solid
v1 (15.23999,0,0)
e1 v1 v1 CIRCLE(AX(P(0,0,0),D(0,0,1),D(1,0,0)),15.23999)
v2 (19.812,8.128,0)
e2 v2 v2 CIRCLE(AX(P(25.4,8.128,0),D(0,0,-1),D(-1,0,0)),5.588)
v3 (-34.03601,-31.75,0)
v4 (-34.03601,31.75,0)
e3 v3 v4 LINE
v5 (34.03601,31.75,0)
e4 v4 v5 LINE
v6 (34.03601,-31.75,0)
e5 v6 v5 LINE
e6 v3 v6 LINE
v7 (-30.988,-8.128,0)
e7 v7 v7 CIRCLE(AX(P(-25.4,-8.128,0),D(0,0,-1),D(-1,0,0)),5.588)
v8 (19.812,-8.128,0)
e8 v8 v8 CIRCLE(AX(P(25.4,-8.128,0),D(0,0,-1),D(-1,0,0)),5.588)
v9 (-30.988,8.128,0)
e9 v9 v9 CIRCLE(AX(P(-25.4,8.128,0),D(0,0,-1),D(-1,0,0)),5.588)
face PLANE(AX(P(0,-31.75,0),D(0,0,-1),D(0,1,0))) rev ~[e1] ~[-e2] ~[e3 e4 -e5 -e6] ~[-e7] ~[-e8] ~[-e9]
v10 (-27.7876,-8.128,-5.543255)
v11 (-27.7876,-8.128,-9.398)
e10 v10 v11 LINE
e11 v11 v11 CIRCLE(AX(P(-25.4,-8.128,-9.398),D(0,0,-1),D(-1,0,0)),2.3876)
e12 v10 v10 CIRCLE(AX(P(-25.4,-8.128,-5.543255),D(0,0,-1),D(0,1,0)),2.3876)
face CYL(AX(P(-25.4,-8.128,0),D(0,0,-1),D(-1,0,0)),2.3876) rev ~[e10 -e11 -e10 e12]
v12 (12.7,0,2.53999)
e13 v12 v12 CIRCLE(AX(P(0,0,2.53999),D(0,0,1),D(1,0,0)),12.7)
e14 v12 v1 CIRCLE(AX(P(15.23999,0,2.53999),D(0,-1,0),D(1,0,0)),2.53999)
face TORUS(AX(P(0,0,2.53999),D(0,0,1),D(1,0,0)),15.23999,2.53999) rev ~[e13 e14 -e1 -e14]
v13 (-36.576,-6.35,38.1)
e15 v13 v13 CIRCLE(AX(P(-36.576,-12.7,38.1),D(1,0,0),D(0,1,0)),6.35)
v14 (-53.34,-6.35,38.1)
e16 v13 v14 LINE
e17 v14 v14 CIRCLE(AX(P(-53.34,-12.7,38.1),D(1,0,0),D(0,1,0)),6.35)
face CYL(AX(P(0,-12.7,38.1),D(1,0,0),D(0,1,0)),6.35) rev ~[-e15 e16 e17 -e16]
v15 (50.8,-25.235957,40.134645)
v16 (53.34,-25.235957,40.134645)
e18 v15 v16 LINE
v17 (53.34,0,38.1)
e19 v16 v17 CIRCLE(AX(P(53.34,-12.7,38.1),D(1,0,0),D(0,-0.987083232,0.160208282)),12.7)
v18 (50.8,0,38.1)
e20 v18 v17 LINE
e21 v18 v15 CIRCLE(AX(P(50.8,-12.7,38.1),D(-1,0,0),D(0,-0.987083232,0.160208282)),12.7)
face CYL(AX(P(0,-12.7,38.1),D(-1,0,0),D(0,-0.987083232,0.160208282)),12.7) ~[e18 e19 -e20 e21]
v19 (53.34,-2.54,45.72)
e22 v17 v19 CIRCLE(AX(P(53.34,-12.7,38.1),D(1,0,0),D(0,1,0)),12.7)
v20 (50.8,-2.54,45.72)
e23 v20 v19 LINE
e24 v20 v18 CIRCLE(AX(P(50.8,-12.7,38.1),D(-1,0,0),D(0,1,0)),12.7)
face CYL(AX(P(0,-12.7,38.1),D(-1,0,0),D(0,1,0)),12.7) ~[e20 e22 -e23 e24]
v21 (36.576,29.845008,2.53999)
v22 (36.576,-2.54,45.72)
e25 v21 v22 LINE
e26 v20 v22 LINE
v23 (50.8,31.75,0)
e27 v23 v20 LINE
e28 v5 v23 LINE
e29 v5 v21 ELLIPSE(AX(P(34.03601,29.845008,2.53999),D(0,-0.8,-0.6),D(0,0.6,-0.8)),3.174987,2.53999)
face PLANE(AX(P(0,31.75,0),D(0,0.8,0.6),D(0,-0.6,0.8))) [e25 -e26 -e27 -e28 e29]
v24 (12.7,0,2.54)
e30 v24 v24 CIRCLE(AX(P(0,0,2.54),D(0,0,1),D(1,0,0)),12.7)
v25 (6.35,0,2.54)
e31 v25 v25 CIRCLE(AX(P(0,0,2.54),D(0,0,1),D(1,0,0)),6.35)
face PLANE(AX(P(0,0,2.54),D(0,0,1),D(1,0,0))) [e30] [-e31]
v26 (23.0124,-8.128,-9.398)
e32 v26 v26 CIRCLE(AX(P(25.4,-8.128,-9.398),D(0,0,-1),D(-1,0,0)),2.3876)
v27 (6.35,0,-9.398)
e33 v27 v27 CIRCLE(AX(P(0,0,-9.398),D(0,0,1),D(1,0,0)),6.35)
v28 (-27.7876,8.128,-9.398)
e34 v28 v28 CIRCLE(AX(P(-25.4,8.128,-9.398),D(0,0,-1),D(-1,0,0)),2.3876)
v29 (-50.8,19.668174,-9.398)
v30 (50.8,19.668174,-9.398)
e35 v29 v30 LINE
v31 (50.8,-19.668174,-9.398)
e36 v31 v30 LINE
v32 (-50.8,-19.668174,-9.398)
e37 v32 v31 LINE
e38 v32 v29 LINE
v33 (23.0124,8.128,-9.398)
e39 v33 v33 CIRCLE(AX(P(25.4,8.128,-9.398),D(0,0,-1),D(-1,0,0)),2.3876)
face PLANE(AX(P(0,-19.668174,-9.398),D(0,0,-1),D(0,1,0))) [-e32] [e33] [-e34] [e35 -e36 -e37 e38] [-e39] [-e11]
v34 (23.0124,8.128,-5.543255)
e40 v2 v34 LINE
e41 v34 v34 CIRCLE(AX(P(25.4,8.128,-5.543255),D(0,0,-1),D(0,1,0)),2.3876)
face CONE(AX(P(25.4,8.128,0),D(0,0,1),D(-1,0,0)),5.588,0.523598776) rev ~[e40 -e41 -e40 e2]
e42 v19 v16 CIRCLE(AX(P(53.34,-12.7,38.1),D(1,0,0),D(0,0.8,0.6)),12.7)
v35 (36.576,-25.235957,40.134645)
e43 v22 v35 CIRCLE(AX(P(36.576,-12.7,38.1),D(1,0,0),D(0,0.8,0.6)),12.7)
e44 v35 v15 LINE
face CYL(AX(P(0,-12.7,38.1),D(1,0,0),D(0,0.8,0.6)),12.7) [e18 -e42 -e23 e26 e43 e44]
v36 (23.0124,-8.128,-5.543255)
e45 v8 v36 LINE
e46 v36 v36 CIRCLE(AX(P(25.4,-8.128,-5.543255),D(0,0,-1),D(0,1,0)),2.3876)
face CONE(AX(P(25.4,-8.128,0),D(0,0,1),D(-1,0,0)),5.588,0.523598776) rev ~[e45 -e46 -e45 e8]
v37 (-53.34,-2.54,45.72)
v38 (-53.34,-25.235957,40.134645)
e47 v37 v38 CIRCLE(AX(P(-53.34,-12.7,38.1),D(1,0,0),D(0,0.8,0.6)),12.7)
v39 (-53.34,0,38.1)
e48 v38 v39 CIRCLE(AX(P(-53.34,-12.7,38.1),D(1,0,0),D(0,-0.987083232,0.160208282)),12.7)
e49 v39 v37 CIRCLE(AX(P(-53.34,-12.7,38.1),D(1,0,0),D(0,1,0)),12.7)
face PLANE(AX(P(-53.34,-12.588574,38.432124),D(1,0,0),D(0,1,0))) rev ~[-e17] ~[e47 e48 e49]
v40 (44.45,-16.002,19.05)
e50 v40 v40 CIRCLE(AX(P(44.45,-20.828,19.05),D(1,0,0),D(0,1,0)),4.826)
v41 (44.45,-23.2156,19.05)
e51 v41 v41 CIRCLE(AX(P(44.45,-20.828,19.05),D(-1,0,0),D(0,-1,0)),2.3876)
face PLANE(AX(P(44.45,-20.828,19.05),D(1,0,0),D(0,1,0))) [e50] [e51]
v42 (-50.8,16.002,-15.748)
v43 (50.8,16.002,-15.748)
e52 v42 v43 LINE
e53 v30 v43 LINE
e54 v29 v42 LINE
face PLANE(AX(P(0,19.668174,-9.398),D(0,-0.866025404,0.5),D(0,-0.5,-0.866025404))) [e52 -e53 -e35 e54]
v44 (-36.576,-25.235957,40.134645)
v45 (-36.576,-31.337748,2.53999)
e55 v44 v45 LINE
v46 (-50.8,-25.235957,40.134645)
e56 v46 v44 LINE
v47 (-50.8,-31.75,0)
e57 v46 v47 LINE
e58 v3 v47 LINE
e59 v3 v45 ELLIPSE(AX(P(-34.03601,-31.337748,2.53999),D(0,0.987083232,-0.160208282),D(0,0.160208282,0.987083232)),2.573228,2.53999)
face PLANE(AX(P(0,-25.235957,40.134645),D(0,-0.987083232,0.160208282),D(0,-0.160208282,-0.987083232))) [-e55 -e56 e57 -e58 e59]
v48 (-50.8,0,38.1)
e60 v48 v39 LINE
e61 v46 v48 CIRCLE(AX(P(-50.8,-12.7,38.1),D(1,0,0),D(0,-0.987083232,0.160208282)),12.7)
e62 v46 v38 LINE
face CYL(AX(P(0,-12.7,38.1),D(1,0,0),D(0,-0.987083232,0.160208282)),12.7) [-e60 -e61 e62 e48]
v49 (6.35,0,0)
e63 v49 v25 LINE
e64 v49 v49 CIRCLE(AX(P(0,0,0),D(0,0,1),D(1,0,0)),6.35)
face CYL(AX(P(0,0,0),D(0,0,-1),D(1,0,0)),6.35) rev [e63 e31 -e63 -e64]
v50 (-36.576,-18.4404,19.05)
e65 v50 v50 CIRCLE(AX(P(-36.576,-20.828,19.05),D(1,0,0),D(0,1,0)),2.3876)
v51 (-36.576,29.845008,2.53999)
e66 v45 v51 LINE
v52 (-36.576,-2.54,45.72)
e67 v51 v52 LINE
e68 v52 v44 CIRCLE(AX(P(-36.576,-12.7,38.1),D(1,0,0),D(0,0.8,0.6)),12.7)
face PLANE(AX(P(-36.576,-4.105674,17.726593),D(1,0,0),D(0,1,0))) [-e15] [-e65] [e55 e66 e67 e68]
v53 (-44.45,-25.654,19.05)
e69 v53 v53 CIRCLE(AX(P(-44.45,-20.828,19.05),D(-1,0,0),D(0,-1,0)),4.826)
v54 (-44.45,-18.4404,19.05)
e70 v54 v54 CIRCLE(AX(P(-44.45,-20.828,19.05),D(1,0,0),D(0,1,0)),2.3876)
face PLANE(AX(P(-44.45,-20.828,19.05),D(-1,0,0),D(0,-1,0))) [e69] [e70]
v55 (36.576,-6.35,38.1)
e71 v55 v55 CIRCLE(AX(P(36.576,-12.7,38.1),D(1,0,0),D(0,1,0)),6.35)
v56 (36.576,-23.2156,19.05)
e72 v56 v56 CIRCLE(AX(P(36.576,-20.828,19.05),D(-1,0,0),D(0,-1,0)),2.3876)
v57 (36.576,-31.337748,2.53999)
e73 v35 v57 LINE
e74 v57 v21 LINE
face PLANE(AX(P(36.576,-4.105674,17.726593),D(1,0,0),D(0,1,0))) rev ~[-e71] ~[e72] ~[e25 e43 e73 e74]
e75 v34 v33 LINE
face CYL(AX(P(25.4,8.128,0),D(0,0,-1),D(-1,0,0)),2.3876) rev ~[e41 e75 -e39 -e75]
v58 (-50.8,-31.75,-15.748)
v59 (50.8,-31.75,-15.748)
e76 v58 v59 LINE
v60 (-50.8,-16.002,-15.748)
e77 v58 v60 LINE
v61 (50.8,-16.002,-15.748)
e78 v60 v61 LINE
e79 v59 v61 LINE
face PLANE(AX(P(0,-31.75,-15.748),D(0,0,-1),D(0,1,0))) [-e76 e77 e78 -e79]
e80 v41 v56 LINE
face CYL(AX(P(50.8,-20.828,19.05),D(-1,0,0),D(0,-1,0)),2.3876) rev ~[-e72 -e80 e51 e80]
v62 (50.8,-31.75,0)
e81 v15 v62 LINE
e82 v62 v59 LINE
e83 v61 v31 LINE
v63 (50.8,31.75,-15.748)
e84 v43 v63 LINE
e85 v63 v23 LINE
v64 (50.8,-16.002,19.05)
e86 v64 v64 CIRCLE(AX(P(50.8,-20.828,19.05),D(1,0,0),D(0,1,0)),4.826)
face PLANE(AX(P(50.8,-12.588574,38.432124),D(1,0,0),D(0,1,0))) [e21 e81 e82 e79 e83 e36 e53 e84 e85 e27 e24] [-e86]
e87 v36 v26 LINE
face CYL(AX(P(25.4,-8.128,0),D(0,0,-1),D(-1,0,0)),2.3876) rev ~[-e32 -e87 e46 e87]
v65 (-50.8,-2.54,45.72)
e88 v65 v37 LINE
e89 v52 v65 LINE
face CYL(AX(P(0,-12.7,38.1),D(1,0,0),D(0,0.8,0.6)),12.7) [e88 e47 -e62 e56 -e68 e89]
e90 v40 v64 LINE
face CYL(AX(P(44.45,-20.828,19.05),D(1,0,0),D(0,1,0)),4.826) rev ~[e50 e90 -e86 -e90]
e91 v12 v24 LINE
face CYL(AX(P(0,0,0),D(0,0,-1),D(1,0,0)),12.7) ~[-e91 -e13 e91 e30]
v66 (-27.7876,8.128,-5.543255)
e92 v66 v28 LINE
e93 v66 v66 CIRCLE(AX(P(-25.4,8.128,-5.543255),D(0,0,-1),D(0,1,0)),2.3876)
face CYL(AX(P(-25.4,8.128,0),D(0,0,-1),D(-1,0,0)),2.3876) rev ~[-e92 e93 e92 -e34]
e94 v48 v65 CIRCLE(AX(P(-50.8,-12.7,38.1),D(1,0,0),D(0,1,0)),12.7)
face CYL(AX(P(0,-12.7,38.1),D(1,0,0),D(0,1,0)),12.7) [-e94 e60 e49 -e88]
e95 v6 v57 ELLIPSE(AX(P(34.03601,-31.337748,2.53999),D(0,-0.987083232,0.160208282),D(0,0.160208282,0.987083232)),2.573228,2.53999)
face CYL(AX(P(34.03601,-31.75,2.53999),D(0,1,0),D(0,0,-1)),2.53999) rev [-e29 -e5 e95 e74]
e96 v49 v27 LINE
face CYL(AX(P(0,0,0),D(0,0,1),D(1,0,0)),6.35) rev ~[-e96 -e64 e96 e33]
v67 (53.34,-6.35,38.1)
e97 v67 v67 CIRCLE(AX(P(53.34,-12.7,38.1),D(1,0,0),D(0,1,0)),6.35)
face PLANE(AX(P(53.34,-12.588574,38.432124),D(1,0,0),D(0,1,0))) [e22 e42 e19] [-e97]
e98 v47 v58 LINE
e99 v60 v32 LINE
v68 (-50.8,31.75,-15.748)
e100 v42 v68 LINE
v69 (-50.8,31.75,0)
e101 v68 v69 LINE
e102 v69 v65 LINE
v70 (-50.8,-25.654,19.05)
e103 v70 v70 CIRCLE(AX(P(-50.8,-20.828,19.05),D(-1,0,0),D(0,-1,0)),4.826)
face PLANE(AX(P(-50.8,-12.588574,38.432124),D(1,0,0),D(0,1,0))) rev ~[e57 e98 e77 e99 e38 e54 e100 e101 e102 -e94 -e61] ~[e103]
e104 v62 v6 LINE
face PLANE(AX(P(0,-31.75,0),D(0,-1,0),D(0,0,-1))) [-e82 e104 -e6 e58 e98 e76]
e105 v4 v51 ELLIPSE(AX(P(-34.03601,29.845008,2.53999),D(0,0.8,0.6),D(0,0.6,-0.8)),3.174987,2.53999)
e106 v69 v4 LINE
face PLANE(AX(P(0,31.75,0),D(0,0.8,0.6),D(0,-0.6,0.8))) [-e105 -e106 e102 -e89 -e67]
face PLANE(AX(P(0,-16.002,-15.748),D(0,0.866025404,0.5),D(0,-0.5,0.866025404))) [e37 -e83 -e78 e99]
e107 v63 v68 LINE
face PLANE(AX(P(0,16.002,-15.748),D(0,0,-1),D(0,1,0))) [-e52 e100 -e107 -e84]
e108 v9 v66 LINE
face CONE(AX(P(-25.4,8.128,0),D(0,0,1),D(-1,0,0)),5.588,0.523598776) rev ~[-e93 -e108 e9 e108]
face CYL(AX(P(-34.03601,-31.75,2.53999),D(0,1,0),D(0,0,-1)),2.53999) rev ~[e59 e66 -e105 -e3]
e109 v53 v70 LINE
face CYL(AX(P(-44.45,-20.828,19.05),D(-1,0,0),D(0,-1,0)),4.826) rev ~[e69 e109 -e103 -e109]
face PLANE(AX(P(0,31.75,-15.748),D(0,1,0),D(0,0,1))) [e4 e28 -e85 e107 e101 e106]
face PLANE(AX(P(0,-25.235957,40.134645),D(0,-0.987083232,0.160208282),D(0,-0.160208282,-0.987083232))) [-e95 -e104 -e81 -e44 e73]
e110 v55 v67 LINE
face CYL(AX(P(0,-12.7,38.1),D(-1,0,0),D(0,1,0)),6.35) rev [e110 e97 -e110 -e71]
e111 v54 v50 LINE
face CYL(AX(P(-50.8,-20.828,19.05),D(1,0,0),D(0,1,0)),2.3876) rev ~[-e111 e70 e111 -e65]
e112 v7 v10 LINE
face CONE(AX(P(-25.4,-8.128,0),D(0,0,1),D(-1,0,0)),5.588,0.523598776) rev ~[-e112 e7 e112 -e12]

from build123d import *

# Parameters (mm, degrees)
F0_R            = 6.35
F1_DEPTH        = 50.8
F2_DEPTH        = 53.34
F3_DEPTH        = 36.576
F5_D            = 4.7752
F5_CSINK_D      = 11.176
F5_CSINK_ANGLE  = 60
F4_R            = 6.35
F6_DEPTH        = 25.4
F4_R_2          = 12.7
F7_DEPTH        = 2.54
F8_R            = 2.53999
F10_D           = 4.7752
F10_DEPTH       = 25.4
F10_CBORE_D     = 9.652
F10_CBORE_DEPTH = 6.35
F10_TIP         = 1.434614814
F12_D           = 4.7752
F12_DEPTH       = 25.4
F12_CBORE_D     = 9.652
F12_CBORE_DEPTH = 6.35
F12_TIP         = 1.434614814


# Not quite as in the source:
# - a fillet or chamfer is up to 0.001 mm smaller than in the source, because OpenCascade refuses the exact size


with BuildPart() as f1:
    # F0 (on Right) → F1 (new body, symmetric)
    with BuildSketch(Plane.YZ):
        with BuildLine():
            ThreePointArc((-25.2359570421, 40.1346451877), (-13.7206237225, 25.44107717), (0, 38.1))
            ThreePointArc((0, 38.1), (-0.6517221148, 42.1160926284), (-2.54, 45.72))
            ThreePointArc((-2.54, 45.72), (-15.7348542076, 50.4320582199), (-25.2359570421, 40.1346451877))
        make_face()
        with Locations((-12.7, 38.1)):
            Circle(F0_R, mode=Mode.SUBTRACT)
        with BuildLine():
            ThreePointArc((-2.54, 45.72), (-0.6517221148, 42.1160926284), (0, 38.1))
            ThreePointArc((0, 38.1), (-13.7206237225, 25.44107717), (-25.2359570421, 40.1346451877))
            Line((-25.2359570421, 40.1346451877), (-31.75, 0))
            Line((-31.75, 0), (31.75, 0))
            Line((31.75, 0), (-2.54, 45.72))
        make_face()
        Polygon((31.75, -15.748), (31.75, 0), (-31.75, 0), (-31.75, -15.748), (-16.002, -15.748), (-19.6681742094, -9.398), (19.6681742094, -9.398), (16.002, -15.748), align=None)
    extrude(amount=F1_DEPTH, both=True)

    # F0 (on Right) → F2 (join, symmetric)
    with BuildSketch(Plane.YZ):
        with BuildLine():
            ThreePointArc((-25.2359570421, 40.1346451877), (-13.7206237225, 25.44107717), (0, 38.1))
            ThreePointArc((0, 38.1), (-0.6517221148, 42.1160926284), (-2.54, 45.72))
            ThreePointArc((-2.54, 45.72), (-15.7348542076, 50.4320582199), (-25.2359570421, 40.1346451877))
        make_face()
        with Locations((-12.7, 38.1)):
            Circle(F0_R, mode=Mode.SUBTRACT)
    extrude(amount=F2_DEPTH, both=True)

    # F0 (on Right) → F3 (cut, symmetric)
    with BuildSketch(Plane.YZ):
        with BuildLine():
            ThreePointArc((-2.54, 45.72), (-0.6517221148, 42.1160926284), (0, 38.1))
            ThreePointArc((0, 38.1), (-13.7206237225, 25.44107717), (-25.2359570421, 40.1346451877))
            Line((-25.2359570421, 40.1346451877), (-31.75, 0))
            Line((-31.75, 0), (31.75, 0))
            Line((31.75, 0), (-2.54, 45.72))
        make_face()
        with BuildLine():
            ThreePointArc((-25.2359570421, 40.1346451877), (-13.7206237225, 25.44107717), (0, 38.1))
            ThreePointArc((0, 38.1), (-0.6517221148, 42.1160926284), (-2.54, 45.72))
            ThreePointArc((-2.54, 45.72), (-15.7348542076, 50.4320582199), (-25.2359570421, 40.1346451877))
        make_face()
        with Locations((-12.7, 38.1)):
            Circle(F0_R, mode=Mode.SUBTRACT)
    extrude(amount=F3_DEPTH, both=True, mode=Mode.SUBTRACT)

    # F5 (through all)
    with Locations(Plane.XY):
        with Locations((-25.4, 8.128), (-25.4, -8.128), (25.4, 8.128), (25.4, -8.128)):
            CounterSinkHole(F5_D / 2, F5_CSINK_D / 2, counter_sink_angle=F5_CSINK_ANGLE)

    # F4 (on face) → F6 (cut)
    with BuildSketch(Plane.XY):
        Circle(F4_R)
    extrude(amount=-F6_DEPTH, mode=Mode.SUBTRACT)

    # F4 (on face) → F7 (join)
    with BuildSketch(Plane.XY):
        Circle(F4_R_2)
        Circle(F4_R, mode=Mode.SUBTRACT)
    extrude(amount=F7_DEPTH)

    # F8 (radius 2.54 in the source; OpenCascade refuses exactly that, so slightly less here)
    f8_edges = [f1.edges().sort_by_distance(p)[0] for p in [
        (-12.7, 0, 0),
        (36.576, 0, 0),
        (-36.576, 0, 0),
    ]]
    fillet(f8_edges, radius=F8_R)

    # F10
    with Locations(Plane.YZ.offset(50.8)):
        with Locations((-20.828, 19.05)):
            CounterBoreHole(F10_D / 2, F10_CBORE_D / 2, F10_CBORE_DEPTH, depth=F10_DEPTH)
            with Locations((0, 0, -(F10_DEPTH + F10_TIP / 2))):  # 118° drill point
                Cone(0, F10_D / 2, F10_TIP, mode=Mode.SUBTRACT)

    # F12
    with Locations(Plane(origin=(-50.8, 0, 0), x_dir=(0, -1, 0), z_dir=(-1, 0, 0))):
        with Locations((20.828, 19.05)):
            CounterBoreHole(F12_D / 2, F12_CBORE_D / 2, F12_CBORE_DEPTH, depth=F12_DEPTH)
            with Locations((0, 0, -(F12_DEPTH + F12_TIP / 2))):  # 118° drill point
                Cone(0, F12_D / 2, F12_TIP, mode=Mode.SUBTRACT)


solid = f1.part
